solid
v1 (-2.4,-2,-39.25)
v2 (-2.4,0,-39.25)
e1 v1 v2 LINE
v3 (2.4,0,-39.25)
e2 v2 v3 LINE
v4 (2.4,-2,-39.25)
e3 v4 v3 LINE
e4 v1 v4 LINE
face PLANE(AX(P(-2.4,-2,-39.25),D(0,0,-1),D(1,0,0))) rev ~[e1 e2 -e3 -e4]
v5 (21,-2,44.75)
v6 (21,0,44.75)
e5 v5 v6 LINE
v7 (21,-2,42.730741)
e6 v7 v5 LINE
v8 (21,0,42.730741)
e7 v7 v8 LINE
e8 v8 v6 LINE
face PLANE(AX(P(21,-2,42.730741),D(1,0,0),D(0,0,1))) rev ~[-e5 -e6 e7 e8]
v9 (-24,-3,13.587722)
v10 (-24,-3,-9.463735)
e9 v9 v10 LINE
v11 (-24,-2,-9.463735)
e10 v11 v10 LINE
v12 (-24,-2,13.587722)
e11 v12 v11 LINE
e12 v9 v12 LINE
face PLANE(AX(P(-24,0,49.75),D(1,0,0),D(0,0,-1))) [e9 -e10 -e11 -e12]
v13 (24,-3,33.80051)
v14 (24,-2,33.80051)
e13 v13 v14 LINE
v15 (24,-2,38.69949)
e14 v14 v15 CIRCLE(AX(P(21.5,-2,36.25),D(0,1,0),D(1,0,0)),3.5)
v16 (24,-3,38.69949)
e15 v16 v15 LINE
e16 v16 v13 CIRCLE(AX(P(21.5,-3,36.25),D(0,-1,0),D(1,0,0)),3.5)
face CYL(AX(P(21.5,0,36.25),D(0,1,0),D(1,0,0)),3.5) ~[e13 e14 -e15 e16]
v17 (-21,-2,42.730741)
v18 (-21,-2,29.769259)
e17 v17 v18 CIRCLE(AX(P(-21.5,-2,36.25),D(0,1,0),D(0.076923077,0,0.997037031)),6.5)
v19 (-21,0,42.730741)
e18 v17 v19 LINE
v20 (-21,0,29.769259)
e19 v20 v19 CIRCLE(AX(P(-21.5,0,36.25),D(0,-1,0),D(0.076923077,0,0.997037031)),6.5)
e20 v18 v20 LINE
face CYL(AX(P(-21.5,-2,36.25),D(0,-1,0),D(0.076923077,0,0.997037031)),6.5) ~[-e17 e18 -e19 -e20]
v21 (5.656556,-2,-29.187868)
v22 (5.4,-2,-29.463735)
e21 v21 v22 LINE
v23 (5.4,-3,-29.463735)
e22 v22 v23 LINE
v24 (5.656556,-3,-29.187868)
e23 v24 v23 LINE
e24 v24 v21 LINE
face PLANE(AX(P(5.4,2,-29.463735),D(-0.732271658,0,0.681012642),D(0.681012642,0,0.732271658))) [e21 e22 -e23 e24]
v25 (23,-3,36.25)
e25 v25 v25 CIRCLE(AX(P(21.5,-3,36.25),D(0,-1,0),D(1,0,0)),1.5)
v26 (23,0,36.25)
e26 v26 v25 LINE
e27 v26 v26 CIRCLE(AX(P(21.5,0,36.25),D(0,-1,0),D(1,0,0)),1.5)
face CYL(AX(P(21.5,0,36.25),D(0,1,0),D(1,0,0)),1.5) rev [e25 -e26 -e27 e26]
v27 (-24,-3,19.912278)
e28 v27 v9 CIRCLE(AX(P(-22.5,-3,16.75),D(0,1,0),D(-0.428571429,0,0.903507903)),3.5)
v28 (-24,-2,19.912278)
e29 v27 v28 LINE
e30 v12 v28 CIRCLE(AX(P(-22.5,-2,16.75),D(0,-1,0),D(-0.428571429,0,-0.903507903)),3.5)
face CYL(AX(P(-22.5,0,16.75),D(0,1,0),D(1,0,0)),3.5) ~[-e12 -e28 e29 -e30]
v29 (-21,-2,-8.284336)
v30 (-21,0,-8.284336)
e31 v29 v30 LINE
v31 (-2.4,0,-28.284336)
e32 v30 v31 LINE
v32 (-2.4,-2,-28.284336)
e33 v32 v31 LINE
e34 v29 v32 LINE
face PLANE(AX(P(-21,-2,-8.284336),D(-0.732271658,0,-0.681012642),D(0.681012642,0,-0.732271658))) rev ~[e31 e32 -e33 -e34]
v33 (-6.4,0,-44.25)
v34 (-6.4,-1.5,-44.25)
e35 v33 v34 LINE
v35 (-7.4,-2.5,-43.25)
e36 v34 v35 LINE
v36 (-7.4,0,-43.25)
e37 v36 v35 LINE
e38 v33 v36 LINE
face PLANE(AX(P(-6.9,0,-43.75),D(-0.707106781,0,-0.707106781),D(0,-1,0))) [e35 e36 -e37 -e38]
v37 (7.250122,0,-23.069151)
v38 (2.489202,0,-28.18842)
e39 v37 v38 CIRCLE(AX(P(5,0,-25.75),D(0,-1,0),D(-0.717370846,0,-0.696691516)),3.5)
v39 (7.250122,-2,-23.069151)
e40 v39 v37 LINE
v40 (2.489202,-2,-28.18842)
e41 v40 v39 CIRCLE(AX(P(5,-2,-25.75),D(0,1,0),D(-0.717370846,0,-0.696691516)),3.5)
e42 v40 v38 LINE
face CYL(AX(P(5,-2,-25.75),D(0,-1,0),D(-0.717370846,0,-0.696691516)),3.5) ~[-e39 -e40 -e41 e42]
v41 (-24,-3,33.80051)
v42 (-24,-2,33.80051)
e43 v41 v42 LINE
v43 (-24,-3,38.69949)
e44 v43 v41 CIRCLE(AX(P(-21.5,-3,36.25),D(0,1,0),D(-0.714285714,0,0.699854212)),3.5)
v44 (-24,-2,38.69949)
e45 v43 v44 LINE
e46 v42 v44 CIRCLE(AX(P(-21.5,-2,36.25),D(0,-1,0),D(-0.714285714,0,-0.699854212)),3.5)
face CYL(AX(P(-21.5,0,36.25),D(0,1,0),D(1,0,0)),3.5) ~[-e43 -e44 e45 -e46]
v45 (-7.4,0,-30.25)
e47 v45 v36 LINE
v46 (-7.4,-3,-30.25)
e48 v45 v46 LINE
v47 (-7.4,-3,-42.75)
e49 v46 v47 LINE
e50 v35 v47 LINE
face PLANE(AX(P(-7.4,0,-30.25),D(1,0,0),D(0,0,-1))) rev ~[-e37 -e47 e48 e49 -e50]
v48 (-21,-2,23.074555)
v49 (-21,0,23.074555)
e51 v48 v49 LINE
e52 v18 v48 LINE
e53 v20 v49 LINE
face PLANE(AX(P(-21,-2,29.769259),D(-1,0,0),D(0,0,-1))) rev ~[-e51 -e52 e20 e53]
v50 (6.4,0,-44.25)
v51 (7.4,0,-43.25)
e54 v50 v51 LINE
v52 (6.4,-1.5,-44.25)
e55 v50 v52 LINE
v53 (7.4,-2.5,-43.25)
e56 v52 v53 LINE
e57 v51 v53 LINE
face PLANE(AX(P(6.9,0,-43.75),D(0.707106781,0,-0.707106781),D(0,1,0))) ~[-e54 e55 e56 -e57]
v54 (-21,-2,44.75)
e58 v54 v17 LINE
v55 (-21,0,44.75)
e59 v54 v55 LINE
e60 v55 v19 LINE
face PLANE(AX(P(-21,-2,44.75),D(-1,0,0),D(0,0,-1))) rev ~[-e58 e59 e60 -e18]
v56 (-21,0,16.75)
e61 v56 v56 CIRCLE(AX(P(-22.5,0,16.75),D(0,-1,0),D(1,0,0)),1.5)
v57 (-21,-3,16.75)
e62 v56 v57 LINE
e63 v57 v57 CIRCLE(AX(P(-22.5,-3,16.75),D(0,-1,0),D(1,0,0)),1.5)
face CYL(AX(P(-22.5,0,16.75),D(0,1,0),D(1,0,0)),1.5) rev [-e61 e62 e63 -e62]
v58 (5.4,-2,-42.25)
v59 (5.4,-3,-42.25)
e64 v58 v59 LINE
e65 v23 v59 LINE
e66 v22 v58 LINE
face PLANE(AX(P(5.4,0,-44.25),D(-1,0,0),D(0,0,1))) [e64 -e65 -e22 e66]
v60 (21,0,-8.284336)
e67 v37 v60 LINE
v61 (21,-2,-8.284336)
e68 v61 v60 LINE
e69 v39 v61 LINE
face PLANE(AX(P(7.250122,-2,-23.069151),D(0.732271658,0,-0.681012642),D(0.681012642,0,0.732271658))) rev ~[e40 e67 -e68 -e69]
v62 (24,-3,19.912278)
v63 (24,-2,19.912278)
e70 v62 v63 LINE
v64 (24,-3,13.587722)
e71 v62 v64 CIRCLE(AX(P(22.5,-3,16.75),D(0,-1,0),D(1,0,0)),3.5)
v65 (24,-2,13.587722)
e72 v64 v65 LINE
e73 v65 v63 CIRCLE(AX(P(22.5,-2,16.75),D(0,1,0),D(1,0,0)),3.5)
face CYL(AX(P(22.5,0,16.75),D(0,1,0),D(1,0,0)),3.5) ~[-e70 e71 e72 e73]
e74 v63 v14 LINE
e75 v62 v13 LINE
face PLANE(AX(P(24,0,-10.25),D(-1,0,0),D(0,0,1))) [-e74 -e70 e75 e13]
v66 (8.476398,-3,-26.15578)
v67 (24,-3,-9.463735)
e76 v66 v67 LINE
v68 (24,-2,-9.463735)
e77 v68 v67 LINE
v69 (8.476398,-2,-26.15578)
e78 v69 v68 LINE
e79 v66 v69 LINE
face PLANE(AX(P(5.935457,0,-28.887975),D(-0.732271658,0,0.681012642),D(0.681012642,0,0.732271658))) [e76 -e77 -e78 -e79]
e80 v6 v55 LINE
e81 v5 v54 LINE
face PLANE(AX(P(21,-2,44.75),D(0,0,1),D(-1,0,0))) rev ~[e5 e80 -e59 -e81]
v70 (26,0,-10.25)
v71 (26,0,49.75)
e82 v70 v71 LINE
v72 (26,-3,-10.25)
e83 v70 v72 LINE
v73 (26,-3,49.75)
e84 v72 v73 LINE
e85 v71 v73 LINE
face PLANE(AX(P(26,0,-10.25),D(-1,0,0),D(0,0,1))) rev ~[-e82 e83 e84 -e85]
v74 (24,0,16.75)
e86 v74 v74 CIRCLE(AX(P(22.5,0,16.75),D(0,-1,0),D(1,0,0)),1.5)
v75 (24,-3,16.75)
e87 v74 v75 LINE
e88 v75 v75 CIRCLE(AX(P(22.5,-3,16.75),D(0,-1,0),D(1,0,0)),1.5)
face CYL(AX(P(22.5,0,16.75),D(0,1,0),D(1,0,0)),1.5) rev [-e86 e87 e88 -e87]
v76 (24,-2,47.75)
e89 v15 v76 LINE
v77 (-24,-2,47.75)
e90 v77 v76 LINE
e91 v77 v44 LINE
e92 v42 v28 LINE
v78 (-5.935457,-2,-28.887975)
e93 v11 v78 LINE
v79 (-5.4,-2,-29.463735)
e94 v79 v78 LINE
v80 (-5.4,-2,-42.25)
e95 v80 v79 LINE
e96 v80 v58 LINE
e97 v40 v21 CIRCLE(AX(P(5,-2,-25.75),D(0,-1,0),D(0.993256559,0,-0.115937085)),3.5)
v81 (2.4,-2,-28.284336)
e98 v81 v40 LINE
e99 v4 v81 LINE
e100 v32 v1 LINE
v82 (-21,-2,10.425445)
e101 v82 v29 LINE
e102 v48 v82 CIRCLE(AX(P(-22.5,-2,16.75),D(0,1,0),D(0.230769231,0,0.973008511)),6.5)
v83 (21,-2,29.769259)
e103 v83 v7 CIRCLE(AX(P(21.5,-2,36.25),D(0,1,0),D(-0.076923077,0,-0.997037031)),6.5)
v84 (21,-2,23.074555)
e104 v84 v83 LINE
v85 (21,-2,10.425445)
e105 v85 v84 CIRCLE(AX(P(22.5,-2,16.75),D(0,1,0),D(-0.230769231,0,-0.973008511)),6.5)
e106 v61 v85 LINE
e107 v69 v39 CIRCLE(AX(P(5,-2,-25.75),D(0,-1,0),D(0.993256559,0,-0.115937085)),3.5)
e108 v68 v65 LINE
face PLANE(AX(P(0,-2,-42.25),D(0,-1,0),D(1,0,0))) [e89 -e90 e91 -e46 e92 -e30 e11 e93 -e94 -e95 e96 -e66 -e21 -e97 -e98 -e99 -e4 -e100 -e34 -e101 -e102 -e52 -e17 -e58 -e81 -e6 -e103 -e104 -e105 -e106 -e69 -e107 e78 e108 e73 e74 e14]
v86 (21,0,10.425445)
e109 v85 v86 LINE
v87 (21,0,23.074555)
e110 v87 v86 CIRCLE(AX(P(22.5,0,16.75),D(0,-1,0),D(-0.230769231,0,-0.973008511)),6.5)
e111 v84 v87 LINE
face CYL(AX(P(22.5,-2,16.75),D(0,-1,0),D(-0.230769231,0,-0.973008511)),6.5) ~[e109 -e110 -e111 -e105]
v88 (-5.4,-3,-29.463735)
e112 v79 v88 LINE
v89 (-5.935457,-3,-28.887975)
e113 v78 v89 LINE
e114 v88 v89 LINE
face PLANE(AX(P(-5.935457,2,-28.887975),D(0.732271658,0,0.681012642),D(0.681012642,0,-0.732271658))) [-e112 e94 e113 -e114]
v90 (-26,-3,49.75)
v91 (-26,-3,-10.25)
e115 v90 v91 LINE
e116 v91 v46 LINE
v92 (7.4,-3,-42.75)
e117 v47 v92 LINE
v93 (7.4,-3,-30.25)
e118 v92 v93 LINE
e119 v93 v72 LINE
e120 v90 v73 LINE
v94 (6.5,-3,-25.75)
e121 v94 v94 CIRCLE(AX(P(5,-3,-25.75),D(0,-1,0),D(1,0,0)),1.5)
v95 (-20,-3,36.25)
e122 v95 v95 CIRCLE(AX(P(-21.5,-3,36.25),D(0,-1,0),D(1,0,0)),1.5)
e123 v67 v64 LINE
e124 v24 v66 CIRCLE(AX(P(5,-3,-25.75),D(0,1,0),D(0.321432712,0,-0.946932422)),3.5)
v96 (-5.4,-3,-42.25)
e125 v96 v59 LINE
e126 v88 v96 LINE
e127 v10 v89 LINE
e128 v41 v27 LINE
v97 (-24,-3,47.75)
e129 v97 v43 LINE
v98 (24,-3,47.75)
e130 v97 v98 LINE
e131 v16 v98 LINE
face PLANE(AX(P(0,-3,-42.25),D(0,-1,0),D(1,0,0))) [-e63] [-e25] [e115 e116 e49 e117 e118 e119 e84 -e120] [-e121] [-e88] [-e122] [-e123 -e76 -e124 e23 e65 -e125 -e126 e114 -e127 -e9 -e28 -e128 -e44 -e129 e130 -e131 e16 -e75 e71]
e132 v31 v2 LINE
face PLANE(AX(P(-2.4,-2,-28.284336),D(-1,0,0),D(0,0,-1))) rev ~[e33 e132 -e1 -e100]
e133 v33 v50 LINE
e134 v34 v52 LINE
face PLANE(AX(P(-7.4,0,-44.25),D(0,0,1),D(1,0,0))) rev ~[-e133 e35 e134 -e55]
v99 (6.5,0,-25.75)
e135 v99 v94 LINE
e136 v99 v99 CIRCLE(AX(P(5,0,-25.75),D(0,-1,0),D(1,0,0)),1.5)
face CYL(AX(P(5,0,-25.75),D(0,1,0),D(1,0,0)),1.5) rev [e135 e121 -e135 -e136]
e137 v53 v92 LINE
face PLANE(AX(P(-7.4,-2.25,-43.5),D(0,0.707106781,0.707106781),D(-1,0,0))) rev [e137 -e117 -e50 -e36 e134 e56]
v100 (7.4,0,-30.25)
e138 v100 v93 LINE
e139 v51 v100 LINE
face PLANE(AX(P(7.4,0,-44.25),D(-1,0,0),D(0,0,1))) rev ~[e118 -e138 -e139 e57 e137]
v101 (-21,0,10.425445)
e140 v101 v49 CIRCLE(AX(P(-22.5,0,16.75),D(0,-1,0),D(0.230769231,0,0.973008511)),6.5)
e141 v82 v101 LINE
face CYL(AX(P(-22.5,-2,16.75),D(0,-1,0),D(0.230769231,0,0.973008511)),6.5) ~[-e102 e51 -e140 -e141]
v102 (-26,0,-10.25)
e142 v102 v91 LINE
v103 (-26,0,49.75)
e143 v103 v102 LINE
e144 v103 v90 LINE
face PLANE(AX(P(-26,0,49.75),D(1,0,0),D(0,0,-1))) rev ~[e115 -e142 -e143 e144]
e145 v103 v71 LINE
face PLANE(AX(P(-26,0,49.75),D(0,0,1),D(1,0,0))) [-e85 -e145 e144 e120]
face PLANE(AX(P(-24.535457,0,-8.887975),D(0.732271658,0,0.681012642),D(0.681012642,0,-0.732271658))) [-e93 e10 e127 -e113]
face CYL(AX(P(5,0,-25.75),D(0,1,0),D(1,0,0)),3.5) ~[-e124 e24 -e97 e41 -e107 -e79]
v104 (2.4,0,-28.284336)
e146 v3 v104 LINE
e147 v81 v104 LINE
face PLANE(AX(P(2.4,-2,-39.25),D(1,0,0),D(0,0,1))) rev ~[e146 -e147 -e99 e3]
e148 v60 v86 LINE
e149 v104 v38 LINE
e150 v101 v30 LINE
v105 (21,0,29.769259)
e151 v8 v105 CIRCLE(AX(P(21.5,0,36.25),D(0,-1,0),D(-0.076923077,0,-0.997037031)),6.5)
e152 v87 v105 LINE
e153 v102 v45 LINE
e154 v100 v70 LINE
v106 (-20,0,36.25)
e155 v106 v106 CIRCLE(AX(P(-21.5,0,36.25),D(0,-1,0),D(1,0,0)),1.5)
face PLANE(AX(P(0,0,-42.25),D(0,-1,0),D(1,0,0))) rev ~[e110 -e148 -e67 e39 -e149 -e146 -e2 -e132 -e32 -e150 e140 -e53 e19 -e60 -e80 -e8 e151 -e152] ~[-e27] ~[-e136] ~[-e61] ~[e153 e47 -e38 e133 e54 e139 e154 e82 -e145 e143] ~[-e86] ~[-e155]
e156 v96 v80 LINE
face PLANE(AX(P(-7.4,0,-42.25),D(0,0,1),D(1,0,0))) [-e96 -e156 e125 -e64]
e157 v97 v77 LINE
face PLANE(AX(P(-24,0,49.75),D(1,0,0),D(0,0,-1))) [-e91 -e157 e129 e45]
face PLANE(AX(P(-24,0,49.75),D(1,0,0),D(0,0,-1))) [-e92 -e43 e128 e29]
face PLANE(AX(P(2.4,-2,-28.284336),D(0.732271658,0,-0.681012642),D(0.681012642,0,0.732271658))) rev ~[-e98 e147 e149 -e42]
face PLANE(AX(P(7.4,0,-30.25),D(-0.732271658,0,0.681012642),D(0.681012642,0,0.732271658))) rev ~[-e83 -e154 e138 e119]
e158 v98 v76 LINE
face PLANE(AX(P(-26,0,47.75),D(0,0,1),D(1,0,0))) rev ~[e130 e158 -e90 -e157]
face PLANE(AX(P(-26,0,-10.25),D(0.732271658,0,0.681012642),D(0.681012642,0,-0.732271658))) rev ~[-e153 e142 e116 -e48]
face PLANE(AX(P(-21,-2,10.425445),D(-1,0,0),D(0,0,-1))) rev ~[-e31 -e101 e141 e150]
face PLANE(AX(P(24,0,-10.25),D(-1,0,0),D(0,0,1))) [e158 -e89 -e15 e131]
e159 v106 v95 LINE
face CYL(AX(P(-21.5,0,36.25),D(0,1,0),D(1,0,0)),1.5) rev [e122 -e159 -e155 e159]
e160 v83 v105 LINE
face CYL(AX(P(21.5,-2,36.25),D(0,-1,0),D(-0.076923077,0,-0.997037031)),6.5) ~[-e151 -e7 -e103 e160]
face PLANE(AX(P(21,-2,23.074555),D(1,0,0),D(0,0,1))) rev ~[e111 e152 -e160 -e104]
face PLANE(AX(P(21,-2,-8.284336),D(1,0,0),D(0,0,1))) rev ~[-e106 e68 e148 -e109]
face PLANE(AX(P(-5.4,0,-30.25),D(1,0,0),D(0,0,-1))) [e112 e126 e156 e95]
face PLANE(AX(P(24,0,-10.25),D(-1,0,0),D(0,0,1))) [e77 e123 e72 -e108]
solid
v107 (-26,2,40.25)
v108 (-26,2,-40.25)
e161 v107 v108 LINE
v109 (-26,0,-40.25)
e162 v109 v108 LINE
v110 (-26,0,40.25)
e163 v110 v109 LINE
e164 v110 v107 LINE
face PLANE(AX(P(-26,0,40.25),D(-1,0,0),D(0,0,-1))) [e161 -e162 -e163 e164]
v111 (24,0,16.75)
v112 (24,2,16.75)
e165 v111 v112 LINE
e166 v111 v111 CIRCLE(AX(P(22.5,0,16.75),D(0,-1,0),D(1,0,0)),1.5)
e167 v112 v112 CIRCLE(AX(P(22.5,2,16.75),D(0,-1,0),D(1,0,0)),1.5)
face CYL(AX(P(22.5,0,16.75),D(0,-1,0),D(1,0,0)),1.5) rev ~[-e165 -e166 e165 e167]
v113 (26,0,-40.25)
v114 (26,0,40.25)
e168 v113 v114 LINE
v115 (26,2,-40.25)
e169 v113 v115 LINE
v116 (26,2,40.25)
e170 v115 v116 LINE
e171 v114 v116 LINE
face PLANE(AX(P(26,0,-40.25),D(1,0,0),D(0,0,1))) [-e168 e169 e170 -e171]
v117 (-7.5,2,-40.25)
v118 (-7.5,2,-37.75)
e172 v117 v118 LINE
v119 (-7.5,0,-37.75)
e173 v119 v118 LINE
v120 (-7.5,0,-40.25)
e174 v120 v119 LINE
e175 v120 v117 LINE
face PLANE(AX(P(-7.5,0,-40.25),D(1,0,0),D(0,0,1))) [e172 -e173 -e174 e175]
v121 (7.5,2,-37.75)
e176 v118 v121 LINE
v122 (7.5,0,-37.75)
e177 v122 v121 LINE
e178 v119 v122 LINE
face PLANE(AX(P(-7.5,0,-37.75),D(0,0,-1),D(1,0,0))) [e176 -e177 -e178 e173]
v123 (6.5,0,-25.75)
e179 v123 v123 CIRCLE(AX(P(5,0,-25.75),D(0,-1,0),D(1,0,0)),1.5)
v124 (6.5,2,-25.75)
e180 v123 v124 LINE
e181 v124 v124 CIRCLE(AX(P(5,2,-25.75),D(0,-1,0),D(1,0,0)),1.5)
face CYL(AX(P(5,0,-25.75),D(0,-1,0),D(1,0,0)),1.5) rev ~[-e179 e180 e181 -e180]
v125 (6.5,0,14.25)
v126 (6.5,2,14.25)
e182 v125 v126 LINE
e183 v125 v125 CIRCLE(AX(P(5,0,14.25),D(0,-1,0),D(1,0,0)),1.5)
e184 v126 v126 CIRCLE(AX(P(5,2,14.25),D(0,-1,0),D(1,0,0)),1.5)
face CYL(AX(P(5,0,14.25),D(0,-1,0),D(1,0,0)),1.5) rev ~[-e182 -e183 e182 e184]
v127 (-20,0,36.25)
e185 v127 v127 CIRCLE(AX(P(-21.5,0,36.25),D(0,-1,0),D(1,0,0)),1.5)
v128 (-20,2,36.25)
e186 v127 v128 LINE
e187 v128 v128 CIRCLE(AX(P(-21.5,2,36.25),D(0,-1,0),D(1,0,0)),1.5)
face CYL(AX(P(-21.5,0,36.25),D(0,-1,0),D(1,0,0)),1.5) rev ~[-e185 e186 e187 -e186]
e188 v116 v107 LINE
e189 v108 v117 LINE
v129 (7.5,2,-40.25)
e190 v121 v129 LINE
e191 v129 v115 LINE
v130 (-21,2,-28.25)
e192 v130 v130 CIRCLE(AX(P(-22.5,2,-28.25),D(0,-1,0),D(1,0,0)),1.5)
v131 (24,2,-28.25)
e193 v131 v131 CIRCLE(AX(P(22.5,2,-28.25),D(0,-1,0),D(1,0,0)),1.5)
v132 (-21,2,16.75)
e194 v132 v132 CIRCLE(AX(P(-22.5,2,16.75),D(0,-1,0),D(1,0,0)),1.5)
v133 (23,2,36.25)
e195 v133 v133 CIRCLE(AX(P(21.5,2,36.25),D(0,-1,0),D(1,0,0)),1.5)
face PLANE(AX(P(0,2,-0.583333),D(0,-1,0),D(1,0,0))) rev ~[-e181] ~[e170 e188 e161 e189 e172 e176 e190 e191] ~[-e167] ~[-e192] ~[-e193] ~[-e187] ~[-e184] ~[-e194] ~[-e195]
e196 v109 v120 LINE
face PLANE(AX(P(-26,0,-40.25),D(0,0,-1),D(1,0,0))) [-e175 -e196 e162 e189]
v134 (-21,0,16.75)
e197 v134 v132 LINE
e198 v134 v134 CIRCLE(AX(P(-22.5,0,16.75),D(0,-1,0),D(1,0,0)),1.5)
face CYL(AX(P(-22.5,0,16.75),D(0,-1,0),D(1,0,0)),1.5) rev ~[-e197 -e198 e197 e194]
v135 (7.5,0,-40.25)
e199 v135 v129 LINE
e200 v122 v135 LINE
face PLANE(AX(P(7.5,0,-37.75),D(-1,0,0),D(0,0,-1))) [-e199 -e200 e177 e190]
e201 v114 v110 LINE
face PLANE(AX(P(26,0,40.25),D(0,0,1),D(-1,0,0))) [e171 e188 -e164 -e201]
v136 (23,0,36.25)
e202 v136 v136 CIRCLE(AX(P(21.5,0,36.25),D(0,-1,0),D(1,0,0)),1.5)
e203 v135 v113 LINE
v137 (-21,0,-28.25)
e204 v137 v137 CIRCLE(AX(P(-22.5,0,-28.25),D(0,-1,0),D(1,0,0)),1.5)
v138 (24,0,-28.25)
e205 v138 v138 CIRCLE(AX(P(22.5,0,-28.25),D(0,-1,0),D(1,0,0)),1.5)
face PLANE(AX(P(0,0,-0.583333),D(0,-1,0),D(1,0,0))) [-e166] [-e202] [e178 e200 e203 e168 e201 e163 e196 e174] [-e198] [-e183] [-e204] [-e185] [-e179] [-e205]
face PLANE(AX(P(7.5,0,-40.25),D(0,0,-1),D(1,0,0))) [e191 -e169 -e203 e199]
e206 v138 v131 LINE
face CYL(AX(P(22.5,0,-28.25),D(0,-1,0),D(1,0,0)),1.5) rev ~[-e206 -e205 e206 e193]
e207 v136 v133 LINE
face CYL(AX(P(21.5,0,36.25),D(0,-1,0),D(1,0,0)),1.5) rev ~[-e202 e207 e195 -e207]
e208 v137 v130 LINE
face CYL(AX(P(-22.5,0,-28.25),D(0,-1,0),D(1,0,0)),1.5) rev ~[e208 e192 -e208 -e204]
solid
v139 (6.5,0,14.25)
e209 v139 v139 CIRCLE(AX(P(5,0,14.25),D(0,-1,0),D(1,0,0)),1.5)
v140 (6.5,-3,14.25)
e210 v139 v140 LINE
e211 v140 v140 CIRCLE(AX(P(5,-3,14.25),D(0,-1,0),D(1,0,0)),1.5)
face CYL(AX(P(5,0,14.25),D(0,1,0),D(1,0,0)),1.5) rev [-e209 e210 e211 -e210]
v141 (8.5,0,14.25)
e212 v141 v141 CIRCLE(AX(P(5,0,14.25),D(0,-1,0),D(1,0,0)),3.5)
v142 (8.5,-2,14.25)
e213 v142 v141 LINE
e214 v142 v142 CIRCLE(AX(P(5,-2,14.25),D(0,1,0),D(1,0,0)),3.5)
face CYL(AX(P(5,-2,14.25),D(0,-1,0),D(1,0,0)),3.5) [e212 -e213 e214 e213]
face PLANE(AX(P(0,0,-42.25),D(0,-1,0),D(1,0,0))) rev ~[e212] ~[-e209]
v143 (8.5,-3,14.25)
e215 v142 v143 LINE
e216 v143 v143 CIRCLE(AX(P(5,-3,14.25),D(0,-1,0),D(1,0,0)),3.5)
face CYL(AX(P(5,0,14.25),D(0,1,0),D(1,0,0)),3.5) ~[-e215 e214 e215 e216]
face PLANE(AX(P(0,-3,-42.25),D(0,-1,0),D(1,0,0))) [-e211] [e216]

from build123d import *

# Parameters (mm, degrees)
F0_R        = 1.5
F1_DEPTH    = 2
F2_W        = 52
F2_H        = 9.5
F2_R        = 1.5
F2_W_2      = 14.8
F2_H_2      = 2.5
F3_DEPTH    = 3
F4_T        = 2
F4_T3_DEPTH = 7
F5_SIZE     = 1.5
F6_SIZE     = 1
F7_R        = 3.5
F8_DEPTH    = 25


# Not quite as in the source:
# - a shell that OpenCascade refuses in one call is made with other operations: the cavity is built on its own and cut out


with BuildPart() as f1:
    # F0 (on Front) → F1 (new body)
    with BuildSketch(Plane.XZ):
        Polygon((26, -40.25), (26, 40.25), (-26, 40.25), (-26, -40.25), (-7.5, -40.25), (-7.5, -37.75), (7.5, -37.75), (7.5, -40.25), align=None)
        with Locations((-22.5, -28.25)):
            Circle(F0_R, mode=Mode.SUBTRACT)
        with Locations((5, -25.75)):
            Circle(F0_R, mode=Mode.SUBTRACT)
        with Locations((22.5, -28.25)):
            Circle(F0_R, mode=Mode.SUBTRACT)
        with Locations((-22.5, 16.75)):
            Circle(F0_R, mode=Mode.SUBTRACT)
        with Locations((-21.5, 36.25)):
            Circle(F0_R, mode=Mode.SUBTRACT)
        with Locations((5, 14.25)):
            Circle(F0_R, mode=Mode.SUBTRACT)
        with Locations((22.5, 16.75)):
            Circle(F0_R, mode=Mode.SUBTRACT)
        with Locations((21.5, 36.25)):
            Circle(F0_R, mode=Mode.SUBTRACT)
    extrude(amount=-F1_DEPTH)


with BuildPart() as f3:
    # F2 (on face) → F3 (new body)
    with BuildSketch(Plane.XZ):
        Polygon((7.4, -40.25), (-7.4, -40.25), (-7.4, -44.25), (0, -44.25), (7.4, -44.25), align=None)
        with Locations((0, 45)):
            Rectangle(F2_W, F2_H)
        Polygon((-26, 40.25), (-26, -10.25), (-7.4, -30.25), (-7.4, -37.75), (7.4, -37.75), (7.4, -30.25), (26, -10.25), (26, 40.25), align=None)
        with Locations((5, -25.75)):
            Circle(F2_R, mode=Mode.SUBTRACT)
        with Locations((-22.5, 16.75)):
            Circle(F2_R, mode=Mode.SUBTRACT)
        with Locations((-21.5, 36.25)):
            Circle(F2_R, mode=Mode.SUBTRACT)
        with Locations((5, 14.25)):
            Circle(F2_R, mode=Mode.SUBTRACT)
        with Locations((22.5, 16.75)):
            Circle(F2_R, mode=Mode.SUBTRACT)
        with Locations((21.5, 36.25)):
            Circle(F2_R, mode=Mode.SUBTRACT)
        with Locations((0, -39)):
            Rectangle(F2_W_2, F2_H_2)
    extrude(amount=F3_DEPTH)

    # F4: shell of thickness 2, made by hand


with BuildPart() as f4_core1:
    # F4_t2: copy of F3
    add(f3.part)

    # the walls: a layer under each face that stays
    f4_faces = [f4_core1.faces().sort_by_distance(p)[0] for p in [
        (0, -1.5, -44.25),
        (7.4, -1.5, -37.25),
        (16.7, -1.5, -20.25),
        (26, -1.5, 19.75),
        (0, -1.5, 49.75),
        (-26, -1.5, 19.75),
        (-16.7, -1.5, -20.25),
        (-7.4, -1.5, -37.25),
        (21, -1.5, 16.75),
        (20, -1.5, 36.25),
        (3.5, -1.5, -25.75),
        (-24, -1.5, 16.75),
        (-23, -1.5, 36.25),
        (3.5, -1.5, 14.25),
        (0, 0, 2.75),
    ]]
    thicken(f4_faces, amount=-F4_T, mode=Mode.SUBTRACT)

    # F4_s4 → F4_t3 (cut)
    with BuildSketch(Plane.XZ.offset(-2)):
        Polygon((7.4346454332, -30.2636202528), (5.4, -30.25), (5.4, -29.4637345908), (5.9354566837, -28.8879747158), align=None)
        Polygon((-7.4346454332, -30.2636202528), (-5.9354566837, -28.8879747158), (-5.4, -29.4637345908), (-5.4, -30.25), align=None)
    extrude(amount=F4_T3_DEPTH, mode=Mode.SUBTRACT)


with BuildPart() as f3_1:
    add(f3.part)

    # what is left inside the walls is the cavity
    f4_cavity = [f4_core1.part.solids().sort_by_distance(p)[0] for p in [
        (0, -2.98, -12.25),
    ]]
    add(f4_cavity, mode=Mode.SUBTRACT)

    # F5
    f5_edges = [f3_1.edges().sort_by_distance(p)[0] for p in [
        (0, -3, -44.25),
    ]]
    chamfer(f5_edges, length=F5_SIZE)

    # F6
    f6_edges = [f3_1.edges().sort_by_distance(p)[0] for p in [
        (-7.4, -0.75, -44.25),
        (7.4, -0.75, -44.25),
    ]]
    chamfer(f6_edges, length=F6_SIZE)

    # F7 (on face) → F8 (cut)
    with BuildSketch(Plane.XZ.offset(2)):
        with BuildLine():
            Line((21, -8.284336477), (21, 10.4254446797))
            ThreePointArc((21, 10.4254446797), (16, 16.75), (21, 23.0745553203))
            Line((21, 23.0745553203), (21, 29.7692593016))
            ThreePointArc((21, 29.7692593016), (15, 36.25), (21, 42.7307406984))
            Line((21, 42.7307406984), (21, 44.75))
            Line((21, 44.75), (-21, 44.75))
            Line((-21, 44.75), (-21, 42.7307406984))
            ThreePointArc((-21, 42.7307406984), (-15, 36.25), (-21, 29.7692593016))
            Line((-21, 29.7692593016), (-21, 23.0745553203))
            ThreePointArc((-21, 23.0745553203), (-16, 16.75), (-21, 10.4254446797))
            Line((-21, 10.4254446797), (-21, -8.284336477))
            Line((-21, -8.284336477), (-2.4, -28.284336477))
            Line((-2.4, -28.284336477), (-2.4, -39.25))
            Line((-2.4, -39.25), (2.4, -39.25))
            Line((2.4, -39.25), (2.4, -28.284336477))
            Line((2.4, -28.284336477), (2.489202038, -28.1884203071))
            ThreePointArc((2.489202038, -28.1884203071), (2.4370491965, -23.3664557527), (7.2501222406, -23.069151272))
            Line((7.2501222406, -23.069151272), (21, -8.284336477))
        make_face()
        with Locations((5, 14.25)):
            Circle(F7_R, mode=Mode.SUBTRACT)
    extrude(amount=-F8_DEPTH, mode=Mode.SUBTRACT)


solid = Compound([f1.part, f3_1.part])
